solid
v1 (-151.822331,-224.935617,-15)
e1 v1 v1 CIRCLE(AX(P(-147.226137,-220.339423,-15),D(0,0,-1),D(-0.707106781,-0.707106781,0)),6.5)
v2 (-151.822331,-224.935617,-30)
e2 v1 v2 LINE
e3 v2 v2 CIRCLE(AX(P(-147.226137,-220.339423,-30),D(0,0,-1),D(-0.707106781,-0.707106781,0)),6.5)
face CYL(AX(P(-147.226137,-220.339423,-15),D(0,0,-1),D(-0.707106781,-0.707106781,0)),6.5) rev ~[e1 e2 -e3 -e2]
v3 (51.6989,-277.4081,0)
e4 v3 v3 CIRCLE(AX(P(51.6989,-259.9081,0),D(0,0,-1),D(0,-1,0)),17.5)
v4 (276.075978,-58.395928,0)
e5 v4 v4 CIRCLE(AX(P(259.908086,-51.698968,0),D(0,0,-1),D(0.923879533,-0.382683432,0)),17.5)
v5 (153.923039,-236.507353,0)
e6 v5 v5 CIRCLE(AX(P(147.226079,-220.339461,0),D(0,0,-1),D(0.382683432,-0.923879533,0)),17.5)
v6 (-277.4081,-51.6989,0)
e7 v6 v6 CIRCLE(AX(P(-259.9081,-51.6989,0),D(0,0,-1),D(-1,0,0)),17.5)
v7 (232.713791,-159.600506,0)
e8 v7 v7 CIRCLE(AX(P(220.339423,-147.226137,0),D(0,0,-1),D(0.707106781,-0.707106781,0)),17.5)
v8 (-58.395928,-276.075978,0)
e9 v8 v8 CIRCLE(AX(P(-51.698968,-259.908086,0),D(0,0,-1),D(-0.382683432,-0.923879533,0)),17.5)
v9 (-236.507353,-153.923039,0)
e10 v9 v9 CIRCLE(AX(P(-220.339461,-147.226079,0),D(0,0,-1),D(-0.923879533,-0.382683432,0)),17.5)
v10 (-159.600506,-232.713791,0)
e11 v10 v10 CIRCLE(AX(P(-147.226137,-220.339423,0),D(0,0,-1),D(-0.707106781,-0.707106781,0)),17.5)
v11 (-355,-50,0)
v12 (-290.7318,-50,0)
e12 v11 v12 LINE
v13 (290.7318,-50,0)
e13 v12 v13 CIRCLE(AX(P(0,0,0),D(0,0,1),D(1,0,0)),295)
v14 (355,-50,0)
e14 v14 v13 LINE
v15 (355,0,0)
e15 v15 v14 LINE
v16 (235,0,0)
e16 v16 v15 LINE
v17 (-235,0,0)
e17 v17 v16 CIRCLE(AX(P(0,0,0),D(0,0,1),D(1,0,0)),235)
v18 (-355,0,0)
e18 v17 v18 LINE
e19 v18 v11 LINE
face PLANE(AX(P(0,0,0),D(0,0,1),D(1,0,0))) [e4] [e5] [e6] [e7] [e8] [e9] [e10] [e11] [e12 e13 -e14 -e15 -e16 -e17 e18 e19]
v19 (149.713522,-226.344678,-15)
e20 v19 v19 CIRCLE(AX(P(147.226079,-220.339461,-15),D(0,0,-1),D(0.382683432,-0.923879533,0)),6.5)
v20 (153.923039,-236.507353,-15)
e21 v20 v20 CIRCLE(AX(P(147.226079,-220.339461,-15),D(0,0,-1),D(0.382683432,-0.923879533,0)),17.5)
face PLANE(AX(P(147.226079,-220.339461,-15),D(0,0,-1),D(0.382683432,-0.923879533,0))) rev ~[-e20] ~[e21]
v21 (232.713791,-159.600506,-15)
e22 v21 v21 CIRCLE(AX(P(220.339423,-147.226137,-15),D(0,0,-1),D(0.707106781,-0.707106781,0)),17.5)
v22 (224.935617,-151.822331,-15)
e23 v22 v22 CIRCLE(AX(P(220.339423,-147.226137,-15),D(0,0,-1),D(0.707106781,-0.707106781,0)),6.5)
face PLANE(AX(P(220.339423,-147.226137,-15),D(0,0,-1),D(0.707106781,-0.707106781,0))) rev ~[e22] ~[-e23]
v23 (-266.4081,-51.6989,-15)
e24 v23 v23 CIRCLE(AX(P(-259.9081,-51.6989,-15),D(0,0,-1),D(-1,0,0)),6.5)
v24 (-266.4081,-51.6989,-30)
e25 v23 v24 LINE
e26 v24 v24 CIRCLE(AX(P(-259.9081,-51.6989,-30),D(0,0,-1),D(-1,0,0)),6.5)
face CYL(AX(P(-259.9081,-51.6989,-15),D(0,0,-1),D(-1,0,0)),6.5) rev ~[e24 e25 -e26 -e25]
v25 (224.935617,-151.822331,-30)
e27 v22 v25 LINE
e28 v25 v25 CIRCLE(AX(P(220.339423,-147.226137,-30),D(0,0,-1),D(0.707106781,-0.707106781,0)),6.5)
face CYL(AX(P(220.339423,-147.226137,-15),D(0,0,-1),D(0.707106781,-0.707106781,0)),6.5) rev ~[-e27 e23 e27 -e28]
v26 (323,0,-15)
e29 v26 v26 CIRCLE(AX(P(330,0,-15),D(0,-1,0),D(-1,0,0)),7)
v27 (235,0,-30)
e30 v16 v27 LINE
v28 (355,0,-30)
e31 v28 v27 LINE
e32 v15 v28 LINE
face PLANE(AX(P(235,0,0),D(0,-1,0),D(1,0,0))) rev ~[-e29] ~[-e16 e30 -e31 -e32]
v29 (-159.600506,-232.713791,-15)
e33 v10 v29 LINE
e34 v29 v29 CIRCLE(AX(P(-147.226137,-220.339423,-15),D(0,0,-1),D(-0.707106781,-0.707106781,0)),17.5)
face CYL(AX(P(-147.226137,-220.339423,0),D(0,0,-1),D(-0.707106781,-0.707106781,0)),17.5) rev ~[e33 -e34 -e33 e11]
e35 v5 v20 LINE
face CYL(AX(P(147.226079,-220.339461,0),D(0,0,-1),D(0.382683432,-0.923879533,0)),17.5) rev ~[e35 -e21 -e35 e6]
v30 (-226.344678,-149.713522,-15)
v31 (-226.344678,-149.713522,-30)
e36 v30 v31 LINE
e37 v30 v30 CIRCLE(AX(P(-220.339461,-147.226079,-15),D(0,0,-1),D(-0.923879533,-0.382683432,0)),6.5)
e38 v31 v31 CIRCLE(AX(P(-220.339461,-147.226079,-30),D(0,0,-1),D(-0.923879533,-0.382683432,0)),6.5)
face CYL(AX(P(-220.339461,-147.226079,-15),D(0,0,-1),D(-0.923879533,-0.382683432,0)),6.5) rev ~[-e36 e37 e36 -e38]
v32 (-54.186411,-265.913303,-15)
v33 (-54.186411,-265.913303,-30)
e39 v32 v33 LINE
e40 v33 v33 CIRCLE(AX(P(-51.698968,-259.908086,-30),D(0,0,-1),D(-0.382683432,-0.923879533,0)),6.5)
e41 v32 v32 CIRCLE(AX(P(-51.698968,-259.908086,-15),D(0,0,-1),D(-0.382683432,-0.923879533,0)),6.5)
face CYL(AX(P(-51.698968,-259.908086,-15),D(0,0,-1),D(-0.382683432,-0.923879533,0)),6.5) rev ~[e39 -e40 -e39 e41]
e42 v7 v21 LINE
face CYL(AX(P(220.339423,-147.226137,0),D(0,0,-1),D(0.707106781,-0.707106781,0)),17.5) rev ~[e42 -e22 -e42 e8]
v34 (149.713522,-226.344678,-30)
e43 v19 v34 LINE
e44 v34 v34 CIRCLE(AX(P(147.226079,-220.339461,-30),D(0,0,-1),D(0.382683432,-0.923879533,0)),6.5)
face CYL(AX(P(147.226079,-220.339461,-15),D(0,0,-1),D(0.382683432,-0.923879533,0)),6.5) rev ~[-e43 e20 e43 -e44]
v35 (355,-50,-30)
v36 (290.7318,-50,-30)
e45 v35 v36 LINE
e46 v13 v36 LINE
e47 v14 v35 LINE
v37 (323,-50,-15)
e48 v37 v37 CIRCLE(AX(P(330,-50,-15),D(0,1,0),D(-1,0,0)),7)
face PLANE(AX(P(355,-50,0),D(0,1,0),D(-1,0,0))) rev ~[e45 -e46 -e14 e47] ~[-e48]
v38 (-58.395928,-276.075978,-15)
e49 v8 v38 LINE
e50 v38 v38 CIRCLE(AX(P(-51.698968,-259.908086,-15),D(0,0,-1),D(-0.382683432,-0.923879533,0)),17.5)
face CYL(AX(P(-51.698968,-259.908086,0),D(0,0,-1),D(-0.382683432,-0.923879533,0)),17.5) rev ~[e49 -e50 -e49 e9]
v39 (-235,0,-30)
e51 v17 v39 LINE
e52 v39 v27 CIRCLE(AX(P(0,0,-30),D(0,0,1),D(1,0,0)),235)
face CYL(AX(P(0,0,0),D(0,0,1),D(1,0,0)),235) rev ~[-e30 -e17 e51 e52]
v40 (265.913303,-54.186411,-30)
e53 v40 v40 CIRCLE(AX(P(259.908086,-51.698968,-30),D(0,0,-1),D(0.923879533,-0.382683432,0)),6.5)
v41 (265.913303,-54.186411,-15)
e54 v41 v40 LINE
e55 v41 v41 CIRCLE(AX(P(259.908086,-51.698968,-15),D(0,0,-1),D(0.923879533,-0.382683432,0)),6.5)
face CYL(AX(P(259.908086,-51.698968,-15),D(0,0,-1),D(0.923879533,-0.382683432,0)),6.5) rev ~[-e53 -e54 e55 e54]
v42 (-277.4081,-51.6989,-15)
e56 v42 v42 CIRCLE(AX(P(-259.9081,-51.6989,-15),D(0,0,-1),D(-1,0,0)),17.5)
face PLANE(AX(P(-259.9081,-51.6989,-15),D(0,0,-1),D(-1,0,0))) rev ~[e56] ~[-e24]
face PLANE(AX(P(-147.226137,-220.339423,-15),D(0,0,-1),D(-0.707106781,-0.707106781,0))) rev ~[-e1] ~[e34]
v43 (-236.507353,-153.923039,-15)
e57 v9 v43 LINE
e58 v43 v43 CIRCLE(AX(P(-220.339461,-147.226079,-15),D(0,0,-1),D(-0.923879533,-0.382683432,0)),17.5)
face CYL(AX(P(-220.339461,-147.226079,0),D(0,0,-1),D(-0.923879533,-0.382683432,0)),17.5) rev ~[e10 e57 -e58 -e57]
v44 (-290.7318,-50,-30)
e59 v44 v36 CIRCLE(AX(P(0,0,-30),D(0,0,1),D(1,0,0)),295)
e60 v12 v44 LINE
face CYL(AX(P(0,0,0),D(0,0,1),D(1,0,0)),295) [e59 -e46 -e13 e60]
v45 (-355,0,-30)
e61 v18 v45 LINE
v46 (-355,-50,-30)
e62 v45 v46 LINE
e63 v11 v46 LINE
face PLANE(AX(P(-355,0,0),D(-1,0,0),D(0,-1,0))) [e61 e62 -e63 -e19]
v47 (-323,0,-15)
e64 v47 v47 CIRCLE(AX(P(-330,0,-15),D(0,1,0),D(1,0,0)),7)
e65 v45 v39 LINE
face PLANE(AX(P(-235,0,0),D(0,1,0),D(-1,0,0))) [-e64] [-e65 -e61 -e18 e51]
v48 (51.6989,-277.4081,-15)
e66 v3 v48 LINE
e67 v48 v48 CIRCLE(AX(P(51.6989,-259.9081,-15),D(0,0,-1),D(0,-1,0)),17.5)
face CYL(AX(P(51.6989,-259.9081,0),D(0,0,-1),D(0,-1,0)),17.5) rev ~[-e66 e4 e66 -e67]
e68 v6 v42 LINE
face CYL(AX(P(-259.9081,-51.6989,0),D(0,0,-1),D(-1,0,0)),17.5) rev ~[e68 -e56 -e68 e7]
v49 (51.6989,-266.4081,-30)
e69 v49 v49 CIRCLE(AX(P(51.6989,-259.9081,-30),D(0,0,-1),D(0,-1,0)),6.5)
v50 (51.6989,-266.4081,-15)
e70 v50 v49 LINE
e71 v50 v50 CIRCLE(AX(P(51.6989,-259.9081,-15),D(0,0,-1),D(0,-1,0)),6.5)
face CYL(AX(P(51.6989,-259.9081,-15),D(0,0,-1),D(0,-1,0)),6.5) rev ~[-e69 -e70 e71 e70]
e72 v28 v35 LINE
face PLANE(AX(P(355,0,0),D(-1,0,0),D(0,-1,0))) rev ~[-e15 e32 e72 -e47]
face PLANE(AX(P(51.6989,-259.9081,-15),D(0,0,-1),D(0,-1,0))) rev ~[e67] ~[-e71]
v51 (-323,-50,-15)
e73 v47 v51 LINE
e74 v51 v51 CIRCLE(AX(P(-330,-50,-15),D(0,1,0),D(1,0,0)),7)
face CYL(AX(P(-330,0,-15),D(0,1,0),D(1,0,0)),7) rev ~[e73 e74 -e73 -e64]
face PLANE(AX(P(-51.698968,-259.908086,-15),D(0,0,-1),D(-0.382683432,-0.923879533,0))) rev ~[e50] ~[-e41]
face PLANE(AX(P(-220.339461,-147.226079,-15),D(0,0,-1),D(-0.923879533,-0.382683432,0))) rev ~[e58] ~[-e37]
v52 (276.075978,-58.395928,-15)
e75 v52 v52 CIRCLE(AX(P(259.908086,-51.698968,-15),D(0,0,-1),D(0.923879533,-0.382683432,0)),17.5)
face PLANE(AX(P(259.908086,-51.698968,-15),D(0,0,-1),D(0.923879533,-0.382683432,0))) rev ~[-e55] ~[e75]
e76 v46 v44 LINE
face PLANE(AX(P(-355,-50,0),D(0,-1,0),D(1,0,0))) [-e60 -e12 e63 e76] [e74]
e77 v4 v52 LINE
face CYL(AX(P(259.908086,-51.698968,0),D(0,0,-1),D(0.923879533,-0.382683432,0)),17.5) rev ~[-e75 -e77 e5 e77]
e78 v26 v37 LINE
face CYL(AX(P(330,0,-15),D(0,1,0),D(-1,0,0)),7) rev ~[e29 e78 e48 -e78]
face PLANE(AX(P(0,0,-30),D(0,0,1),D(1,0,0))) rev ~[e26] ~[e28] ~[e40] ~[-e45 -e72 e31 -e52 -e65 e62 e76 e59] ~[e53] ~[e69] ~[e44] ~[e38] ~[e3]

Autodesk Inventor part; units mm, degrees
ref_plane "YZ Plane" through (0, 0, 0) normal (1, 0, 0) x (0, 1, 0)
ref_plane "XZ Plane" through (0, 0, 0) normal (0, 1, 0) x (-1, 0, 0)
ref_plane "XY Plane" through (0, 0, 0) normal (0, 0, 1) x (1, 0, 0)
sketch "Sketch1" plane through (0, 0, 0) normal (0, 0, 1) x (1, 0, 0)
  circle A0 centre (0, 0) radius 265 construction
  line L0 (0, 265) -> (0, 295) construction
  line L1 (0, 265) -> (0, 235) construction
  circle A1 centre (0, 0) radius 235
  circle A2 centre (0, 0) radius 295
  line L2 (-235, 0) -> (-235, 80) construction
  line L3 (-235, 80) -> (-295, 80) construction
  line L4 (-295, 80) -> (-295, 0) construction
  line L5 (235, 0) -> (235, 80) construction
  line L6 (235, 80) -> (295, 80) construction
  line L7 (295, 80) -> (295, 0) construction
  line L8 (-235, 0) -> (-295, 0)
  line L9 (-295, 0) -> (-355, 0)
  line L10 (-355, 0) -> (-355, -50)
  line L11 (-355, -50) -> (-290.7318, -50)
  line L12 (235, 0) -> (295, 0)
  line L13 (295, 0) -> (355, 0)
  line L14 (355, 0) -> (355, -50)
  line L15 (355, -50) -> (290.7318, -50)
  dimension "d13" = 530
  dimension "d26" = 80
  dimension "d36" = 60
  dimension "d40" = 60
  dimension "d41" = 50
extrude "Extrusion1" add sketch "Sketch1" against normal blind 30 contours L12 A2 L8 A1 | L13 L14 L15 A2 | A2 L11 L10 L9 picked at (3.5144, -274.7637)
sketch "Sketch4" plane through (0, 0, 0) normal (0, 0, 1) x (1, 0, 0)
  line L0 (0, 0) -> (51.6989, -259.9081) construction
  line L1 (0, 0) -> (0, -276.8337) construction
  dimension "d27" = 265
  dimension "d35" = 11.25
sketch "Sketch7" plane through (0, 0, 0) normal (0, 0, 1) x (1, 0, 0)
  line L0 (-355, -50) -> (-355, 0) construction
  line L1 (-355, -25) -> (355, -25) construction
  line L2 (355, 0) -> (355, -50) construction
  point P0 (0, 0)
  point P1 (-330, -25)
  dimension "d42" = 25
fillet "Fillet1" [suppressed]
hole "Hole1" [suppressed]
hole "Hole2" at (51.6989, -259.9081, 0) direction (0, 0, -1) diameter 13 end through all counterbore diameter 35 counterbore depth 15
pattern_circular "Circular Pattern4" count 9 over 180 about axis through (0, 0, -10) along (0, 0, -1) of "Hole2" both ways yes
mirror "Mirror1" [suppressed]
sketch "Sketch9" plane through (-355, 0, 0) normal (0, 1, 0) x (1, 0, 0)
  circle A0 centre (25, 15) radius 7
  line L0 (0, 0) -> (0, 30) projected
  point P0 (355, 0)
  point P1 (0, 15)
  dimension "d70" = 25
  dimension "d71" = 14
extrude "Extrusion8" cut sketch "Sketch9" against normal through all
mirror "Mirror2" about plane through (0, 0, 0) normal (1, 0, 0) of "Extrusion8"
equation "\"d13\" = Шпил_пласт_КОРМА_диам_центров"
equation "\"d40\" = d36"
equation "\"d27\" = 0.5 * Шпил_пласт_КОРМА_диам_центров"
equation "\"BendReliefDepth\" = 0.5 * Thickness"
equation "\"Шпил_пласт_КОРМА_диам_центров\" = 530"
equation "\"Thickness\" = 30"
properties part number "ДМФ 093 Постель КОРМА"
